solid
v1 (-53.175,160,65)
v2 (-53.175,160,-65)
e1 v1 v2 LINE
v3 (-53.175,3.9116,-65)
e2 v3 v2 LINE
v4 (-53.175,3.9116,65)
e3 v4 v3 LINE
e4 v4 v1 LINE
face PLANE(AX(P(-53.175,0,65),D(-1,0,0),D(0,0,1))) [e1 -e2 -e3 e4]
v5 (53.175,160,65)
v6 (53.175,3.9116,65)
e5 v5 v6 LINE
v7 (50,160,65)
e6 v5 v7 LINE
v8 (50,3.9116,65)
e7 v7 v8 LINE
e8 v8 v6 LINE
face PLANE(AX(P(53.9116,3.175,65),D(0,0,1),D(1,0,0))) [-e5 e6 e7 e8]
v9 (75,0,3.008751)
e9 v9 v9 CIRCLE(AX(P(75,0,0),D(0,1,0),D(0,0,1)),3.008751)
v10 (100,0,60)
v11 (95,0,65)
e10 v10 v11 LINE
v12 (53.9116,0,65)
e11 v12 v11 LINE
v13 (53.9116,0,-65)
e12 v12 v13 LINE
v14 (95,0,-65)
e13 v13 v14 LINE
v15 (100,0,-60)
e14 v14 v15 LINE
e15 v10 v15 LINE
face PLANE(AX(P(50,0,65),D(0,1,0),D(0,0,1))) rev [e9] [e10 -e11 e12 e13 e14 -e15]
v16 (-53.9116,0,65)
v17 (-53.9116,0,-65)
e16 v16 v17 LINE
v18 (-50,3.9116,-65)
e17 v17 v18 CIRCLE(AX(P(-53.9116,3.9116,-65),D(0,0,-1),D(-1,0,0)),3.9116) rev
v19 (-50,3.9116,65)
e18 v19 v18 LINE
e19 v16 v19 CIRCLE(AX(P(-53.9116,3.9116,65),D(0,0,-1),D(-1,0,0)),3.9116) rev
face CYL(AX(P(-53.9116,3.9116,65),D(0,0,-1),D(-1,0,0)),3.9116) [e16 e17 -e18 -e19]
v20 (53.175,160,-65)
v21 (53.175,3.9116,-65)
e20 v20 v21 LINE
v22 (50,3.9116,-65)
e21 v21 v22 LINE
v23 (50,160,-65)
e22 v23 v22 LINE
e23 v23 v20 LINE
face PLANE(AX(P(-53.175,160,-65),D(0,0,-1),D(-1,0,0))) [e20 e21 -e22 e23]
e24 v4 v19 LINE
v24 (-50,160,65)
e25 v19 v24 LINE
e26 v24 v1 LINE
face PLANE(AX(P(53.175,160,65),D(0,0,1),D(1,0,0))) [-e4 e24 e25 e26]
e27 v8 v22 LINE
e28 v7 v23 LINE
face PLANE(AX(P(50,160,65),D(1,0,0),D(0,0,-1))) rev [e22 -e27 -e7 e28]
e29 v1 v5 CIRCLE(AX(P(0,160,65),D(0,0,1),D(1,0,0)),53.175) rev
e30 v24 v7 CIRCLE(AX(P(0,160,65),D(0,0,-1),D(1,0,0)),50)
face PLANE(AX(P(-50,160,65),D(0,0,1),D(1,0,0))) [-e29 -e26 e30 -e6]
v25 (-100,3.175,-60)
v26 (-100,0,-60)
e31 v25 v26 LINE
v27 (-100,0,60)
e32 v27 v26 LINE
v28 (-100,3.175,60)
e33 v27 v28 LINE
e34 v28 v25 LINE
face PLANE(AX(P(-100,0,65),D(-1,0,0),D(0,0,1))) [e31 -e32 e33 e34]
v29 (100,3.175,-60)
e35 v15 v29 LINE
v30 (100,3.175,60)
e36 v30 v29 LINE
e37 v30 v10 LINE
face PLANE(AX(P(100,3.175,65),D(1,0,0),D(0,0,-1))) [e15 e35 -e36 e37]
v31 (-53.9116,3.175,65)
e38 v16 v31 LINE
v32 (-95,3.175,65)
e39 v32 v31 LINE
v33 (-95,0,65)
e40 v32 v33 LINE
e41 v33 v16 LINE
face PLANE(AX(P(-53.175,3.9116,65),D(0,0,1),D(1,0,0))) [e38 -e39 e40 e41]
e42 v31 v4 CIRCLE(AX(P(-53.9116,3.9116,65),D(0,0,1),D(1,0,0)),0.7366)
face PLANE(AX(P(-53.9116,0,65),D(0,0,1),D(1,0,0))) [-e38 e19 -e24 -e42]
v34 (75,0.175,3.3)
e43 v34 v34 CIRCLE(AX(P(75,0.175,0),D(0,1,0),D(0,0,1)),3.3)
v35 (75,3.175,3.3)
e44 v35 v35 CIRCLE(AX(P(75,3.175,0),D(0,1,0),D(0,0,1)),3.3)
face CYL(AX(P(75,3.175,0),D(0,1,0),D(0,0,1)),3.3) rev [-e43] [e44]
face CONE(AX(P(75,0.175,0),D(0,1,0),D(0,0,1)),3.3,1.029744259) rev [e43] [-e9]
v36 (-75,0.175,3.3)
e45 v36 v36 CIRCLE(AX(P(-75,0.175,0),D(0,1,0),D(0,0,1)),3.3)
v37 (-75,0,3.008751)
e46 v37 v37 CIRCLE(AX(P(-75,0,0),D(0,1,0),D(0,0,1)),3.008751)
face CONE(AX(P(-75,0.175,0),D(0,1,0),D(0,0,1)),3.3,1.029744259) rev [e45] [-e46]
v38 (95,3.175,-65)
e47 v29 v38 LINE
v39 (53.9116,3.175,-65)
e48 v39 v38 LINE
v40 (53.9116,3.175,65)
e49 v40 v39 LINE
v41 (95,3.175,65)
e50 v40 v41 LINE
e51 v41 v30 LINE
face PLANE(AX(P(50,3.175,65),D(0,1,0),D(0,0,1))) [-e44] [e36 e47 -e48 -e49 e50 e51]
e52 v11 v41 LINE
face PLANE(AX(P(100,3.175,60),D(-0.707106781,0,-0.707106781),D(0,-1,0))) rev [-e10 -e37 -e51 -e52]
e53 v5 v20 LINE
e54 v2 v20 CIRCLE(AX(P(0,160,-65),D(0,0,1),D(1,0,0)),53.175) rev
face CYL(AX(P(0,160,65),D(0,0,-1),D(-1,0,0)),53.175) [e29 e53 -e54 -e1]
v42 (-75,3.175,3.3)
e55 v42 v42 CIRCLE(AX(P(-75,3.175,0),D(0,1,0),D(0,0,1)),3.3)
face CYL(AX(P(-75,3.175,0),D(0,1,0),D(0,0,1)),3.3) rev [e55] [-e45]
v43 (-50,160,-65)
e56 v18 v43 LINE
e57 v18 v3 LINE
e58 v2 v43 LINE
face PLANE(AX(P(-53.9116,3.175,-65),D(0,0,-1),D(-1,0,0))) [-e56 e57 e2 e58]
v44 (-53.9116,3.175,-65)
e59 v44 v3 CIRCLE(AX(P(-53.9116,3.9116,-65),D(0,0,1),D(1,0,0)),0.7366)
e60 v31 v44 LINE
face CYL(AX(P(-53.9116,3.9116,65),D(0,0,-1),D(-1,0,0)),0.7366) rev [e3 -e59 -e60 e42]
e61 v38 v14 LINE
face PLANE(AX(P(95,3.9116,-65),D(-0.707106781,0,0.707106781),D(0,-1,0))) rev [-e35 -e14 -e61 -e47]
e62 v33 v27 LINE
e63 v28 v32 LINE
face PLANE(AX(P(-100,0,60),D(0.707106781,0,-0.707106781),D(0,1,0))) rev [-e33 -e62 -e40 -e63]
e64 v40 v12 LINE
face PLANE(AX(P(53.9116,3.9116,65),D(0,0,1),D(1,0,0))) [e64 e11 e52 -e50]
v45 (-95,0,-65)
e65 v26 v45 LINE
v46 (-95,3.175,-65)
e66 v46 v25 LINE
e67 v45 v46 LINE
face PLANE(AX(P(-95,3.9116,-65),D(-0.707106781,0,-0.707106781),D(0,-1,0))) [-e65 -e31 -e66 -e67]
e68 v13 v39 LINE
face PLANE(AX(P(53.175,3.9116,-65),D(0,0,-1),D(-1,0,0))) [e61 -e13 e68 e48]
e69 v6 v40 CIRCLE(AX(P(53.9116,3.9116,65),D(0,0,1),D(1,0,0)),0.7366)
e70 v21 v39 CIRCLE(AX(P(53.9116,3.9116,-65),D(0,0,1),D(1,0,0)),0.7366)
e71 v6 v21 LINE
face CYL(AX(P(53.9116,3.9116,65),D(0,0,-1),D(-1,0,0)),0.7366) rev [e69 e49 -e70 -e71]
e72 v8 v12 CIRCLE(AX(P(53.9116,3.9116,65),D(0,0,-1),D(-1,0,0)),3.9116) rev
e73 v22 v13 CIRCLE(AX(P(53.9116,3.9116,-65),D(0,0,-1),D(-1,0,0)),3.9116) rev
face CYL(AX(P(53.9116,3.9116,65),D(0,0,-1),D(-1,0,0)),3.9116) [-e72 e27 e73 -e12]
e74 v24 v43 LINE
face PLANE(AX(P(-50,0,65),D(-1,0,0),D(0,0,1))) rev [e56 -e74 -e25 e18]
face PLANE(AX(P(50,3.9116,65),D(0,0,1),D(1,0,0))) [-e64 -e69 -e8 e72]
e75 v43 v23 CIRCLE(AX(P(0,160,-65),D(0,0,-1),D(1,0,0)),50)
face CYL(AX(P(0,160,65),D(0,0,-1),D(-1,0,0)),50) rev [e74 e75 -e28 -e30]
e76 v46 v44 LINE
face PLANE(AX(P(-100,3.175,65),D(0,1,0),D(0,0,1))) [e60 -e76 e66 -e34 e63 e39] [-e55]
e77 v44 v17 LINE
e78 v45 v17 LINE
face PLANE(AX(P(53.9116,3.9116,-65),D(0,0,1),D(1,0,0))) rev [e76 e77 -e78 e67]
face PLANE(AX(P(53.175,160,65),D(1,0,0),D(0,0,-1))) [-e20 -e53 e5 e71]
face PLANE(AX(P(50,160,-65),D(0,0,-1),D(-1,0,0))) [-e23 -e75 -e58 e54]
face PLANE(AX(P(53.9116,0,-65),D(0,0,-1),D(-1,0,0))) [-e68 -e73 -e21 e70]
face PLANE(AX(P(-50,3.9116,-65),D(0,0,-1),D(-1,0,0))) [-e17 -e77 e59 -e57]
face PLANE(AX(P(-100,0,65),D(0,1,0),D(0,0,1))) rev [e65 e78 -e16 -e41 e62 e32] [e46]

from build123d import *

# Parameters (mm, degrees)
BASE_FLANGE1_DEPTH             = 65
CHAMFER1_SIZE                  = 5
F_6_6_6_6_DIAMETER_HOLE1_D     = 6.6
F_6_6_6_6_DIAMETER_HOLE1_DEPTH = 3
F_6_6_6_6_DIAMETER_HOLE1_TIP   = 1.982840043


# Sheet-metal steps are written as plain solids
with BuildPart() as part:
    # Sketch1 → Base-Flange1 (new, symmetric)
    with BuildSketch(Plane.XY):
        with BuildLine():
            Line((-100, 0), (-53.9116, 0))
            ThreePointArc((-53.9116, 0), (-51.145681115, 1.145681115), (-50, 3.9116))
            Line((-50, 3.9116), (-50, 160))
            ThreePointArc((-50, 160), (0, 210), (50, 160))
            Line((50, 160), (50, 3.9116))
            ThreePointArc((50, 3.9116), (51.145681115, 1.145681115), (53.9116, 0))
            Line((53.9116, 0), (100, 0))
            Line((100, 0), (100, 3.175))
            Line((100, 3.175), (53.9116, 3.175))
            ThreePointArc((53.9116, 3.175), (53.390745145, 3.390745145), (53.175, 3.9116))
            Line((53.175, 3.9116), (53.175, 160))
            ThreePointArc((53.175, 160), (0, 213.175), (-53.175, 160))
            Line((-53.175, 160), (-53.175, 3.9116))
            ThreePointArc((-53.175, 3.9116), (-53.390745145, 3.390745145), (-53.9116, 3.175))
            Line((-53.9116, 3.175), (-100, 3.175))
            Line((-100, 3.175), (-100, 0))
        make_face()
    extrude(amount=BASE_FLANGE1_DEPTH, both=True)

    # Chamfer1
    chamfer1_edges = [part.edges().sort_by_distance(p)[0] for p in [
        (-100, 1.5875, -65),
        (100, 1.5875, -65),
        (-100, 1.5875, 65),
        (100, 1.5875, 65),
    ]]
    chamfer(chamfer1_edges, length=CHAMFER1_SIZE)

    # Ø6.6 (6.6) Diameter Hole1
    with Locations(Plane(origin=(75, 3.175, 0), x_dir=(0, 0, 1), z_dir=(0, 1, 0))):
        with Locations((0, 0), (0, -150)):
            Hole(F_6_6_6_6_DIAMETER_HOLE1_D / 2, depth=F_6_6_6_6_DIAMETER_HOLE1_DEPTH)
            with Locations((0, 0, -(F_6_6_6_6_DIAMETER_HOLE1_DEPTH + F_6_6_6_6_DIAMETER_HOLE1_TIP / 2))):  # 118° drill point
                Cone(0, F_6_6_6_6_DIAMETER_HOLE1_D / 2, F_6_6_6_6_DIAMETER_HOLE1_TIP, mode=Mode.SUBTRACT)


solid = part.part
